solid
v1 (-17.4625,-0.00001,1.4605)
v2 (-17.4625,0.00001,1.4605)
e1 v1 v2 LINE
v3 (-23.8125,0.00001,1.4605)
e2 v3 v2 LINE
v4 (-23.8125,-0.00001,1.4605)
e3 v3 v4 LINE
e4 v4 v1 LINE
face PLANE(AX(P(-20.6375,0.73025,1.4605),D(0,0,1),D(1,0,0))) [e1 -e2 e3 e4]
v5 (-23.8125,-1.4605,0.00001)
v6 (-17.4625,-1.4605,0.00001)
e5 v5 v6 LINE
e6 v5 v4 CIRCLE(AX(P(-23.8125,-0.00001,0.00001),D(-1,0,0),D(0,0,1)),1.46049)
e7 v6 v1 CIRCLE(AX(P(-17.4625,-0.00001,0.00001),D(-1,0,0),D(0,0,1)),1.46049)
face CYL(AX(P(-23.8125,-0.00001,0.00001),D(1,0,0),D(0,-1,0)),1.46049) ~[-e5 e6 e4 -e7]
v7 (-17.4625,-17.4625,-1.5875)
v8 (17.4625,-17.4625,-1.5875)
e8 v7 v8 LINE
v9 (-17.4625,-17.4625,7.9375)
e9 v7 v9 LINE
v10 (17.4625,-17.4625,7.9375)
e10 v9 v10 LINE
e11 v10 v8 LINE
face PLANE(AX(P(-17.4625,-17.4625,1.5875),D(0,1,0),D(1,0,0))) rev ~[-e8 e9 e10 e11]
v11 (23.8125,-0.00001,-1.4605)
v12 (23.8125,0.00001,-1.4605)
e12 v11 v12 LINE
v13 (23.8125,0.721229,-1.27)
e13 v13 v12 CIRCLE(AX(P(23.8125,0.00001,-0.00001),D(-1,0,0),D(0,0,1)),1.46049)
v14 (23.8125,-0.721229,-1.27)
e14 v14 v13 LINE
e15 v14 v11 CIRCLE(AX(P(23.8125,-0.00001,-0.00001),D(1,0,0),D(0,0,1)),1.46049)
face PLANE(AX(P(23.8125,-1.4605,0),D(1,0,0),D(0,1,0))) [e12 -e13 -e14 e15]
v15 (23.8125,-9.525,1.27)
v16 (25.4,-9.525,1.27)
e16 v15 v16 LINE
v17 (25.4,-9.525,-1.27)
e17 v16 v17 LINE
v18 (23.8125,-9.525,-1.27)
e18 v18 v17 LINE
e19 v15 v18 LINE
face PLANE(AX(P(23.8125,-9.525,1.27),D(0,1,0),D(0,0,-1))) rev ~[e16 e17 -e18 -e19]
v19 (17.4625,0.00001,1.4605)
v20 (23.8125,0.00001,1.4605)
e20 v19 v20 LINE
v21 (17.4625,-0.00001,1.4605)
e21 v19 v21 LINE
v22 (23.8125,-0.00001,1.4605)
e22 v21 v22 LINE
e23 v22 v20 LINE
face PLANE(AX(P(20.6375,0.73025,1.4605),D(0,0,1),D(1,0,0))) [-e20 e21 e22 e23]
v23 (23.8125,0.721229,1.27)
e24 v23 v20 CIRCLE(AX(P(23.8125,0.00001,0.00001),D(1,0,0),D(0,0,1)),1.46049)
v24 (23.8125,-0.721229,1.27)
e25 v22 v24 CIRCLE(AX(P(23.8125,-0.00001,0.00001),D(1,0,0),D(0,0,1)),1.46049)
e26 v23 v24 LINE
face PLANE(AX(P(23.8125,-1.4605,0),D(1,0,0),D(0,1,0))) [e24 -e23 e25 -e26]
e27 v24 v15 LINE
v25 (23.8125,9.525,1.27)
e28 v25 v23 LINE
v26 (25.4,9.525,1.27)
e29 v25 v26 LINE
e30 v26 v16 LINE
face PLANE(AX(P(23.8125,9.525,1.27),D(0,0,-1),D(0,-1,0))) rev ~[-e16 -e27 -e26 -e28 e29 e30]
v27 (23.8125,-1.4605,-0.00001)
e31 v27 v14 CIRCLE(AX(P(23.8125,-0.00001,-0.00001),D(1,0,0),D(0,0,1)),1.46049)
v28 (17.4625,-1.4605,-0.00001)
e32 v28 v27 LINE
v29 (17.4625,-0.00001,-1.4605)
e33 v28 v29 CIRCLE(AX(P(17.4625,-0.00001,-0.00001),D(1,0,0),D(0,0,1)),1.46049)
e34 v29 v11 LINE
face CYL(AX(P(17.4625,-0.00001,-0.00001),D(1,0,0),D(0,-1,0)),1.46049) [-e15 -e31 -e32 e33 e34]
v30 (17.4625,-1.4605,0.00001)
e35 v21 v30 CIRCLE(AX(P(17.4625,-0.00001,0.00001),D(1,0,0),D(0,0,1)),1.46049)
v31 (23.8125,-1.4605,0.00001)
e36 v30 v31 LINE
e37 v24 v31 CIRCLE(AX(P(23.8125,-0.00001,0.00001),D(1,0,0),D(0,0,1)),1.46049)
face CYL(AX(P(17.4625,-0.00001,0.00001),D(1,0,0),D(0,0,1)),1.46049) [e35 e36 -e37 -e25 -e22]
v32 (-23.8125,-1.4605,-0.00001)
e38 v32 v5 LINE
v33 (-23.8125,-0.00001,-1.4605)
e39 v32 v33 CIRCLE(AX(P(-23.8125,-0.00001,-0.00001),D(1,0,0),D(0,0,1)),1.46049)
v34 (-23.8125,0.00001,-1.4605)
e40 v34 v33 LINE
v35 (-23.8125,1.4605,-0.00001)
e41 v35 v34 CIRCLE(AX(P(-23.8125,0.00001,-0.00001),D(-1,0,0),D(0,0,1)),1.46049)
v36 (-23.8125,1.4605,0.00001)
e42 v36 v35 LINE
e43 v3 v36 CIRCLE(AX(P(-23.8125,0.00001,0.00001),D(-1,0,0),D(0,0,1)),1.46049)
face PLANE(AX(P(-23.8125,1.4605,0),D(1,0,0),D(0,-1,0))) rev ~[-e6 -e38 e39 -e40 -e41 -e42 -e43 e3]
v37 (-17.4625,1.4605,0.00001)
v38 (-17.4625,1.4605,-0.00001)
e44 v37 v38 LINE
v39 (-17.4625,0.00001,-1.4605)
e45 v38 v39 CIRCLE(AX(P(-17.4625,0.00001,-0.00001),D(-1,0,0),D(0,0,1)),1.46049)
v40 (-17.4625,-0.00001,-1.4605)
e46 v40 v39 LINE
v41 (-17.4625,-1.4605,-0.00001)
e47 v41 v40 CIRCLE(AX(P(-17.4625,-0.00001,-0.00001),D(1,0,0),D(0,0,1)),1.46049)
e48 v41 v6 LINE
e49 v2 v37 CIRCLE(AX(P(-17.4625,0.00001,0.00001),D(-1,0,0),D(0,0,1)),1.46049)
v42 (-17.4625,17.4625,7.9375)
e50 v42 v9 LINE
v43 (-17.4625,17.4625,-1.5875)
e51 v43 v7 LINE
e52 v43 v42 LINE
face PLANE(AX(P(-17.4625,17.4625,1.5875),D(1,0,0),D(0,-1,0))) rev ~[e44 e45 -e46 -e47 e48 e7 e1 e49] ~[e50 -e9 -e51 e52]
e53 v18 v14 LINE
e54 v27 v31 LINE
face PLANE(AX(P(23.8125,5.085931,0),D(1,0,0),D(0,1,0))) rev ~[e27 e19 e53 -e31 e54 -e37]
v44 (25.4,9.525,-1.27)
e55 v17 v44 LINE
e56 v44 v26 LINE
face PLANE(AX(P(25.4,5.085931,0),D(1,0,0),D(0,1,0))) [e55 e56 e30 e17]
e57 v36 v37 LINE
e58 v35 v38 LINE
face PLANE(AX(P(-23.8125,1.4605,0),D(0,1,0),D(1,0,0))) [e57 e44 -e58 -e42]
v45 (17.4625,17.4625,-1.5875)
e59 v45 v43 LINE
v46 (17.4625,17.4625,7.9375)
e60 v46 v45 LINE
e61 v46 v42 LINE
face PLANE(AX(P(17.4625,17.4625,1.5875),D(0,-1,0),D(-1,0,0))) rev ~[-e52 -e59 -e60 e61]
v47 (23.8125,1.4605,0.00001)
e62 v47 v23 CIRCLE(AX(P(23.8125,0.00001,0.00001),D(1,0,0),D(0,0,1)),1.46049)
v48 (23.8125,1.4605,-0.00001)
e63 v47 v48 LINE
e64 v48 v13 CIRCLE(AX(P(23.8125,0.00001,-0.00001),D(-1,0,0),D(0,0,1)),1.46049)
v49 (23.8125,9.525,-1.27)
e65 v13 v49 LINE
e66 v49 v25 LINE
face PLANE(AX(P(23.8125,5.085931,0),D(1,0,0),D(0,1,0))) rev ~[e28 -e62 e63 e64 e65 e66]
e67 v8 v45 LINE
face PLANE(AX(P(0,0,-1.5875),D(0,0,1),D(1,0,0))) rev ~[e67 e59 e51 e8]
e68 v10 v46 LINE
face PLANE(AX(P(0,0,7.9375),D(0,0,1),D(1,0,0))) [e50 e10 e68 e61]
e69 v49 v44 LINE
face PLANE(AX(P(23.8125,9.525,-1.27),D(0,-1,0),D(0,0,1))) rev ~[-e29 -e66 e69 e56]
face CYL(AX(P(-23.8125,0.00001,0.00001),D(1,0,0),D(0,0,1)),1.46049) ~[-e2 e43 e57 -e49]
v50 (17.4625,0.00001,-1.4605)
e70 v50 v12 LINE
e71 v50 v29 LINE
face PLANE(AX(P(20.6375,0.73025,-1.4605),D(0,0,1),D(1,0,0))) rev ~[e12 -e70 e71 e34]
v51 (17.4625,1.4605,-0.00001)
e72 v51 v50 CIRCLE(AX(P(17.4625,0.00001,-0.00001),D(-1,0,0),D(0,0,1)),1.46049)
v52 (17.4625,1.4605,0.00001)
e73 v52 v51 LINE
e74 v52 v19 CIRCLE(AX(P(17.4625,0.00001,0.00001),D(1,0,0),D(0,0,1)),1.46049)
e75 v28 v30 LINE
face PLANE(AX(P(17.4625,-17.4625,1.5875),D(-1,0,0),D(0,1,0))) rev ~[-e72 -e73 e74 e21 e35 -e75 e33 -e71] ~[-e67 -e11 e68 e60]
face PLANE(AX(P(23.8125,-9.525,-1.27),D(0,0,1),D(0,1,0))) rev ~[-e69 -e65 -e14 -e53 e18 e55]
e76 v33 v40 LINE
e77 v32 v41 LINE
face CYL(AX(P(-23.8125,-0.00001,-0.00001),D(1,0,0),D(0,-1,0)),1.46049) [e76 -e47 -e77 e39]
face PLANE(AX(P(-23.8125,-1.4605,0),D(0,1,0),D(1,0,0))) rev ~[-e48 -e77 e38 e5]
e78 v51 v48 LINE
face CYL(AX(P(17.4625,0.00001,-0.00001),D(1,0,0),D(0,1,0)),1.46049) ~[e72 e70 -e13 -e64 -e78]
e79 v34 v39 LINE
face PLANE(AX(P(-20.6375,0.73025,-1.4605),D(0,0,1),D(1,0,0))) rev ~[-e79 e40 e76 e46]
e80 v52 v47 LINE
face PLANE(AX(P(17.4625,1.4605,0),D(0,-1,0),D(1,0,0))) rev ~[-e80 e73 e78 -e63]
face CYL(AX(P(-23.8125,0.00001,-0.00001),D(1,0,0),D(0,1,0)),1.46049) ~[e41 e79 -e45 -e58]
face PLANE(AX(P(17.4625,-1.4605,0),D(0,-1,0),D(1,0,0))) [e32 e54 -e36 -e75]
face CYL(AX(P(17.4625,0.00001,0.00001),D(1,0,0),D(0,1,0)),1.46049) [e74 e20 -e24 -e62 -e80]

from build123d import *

# Parameters (mm, degrees)
F0_W     = 31.75
F0_H     = 31.75
F1_DEPTH = 1.5875
F0_W_2   = 6.35
F0_H_2   = 1.4605
F2_DEPTH = 1.4605
F3_R     = 1.46049
F5_DEPTH = 1.5875
F6_DEPTH = 6.35


# Not quite as in the source:
# - a fillet or chamfer is up to 0.001 mm smaller than in the source, because OpenCascade refuses the exact size
# - ends of sketch curves that miss each other by under 0.0002 mm in the source are joined


with BuildPart() as f1:
    # F0 (on Top) → F1 (new body, symmetric)
    with BuildSketch(Plane.XY):
        Polygon((17.4625, 17.4625), (-17.4625, 17.4625), (-17.4625, 1.4605), (-17.4625, 0), (-17.4625, -1.4605), (-17.4625, -17.4625), (17.4625, -17.4625), (17.4625, -1.4605), (17.4625, 0), (17.4625, 1.4605), align=None)
        Rectangle(F0_W, F0_H, mode=Mode.SUBTRACT)
        Rectangle(F0_W, F0_H)
    extrude(amount=F1_DEPTH, both=True)

    # F0 (on Top) → F2 (join, symmetric)
    with BuildSketch(Plane.XY):
        with Locations((-20.6375, 0.73025)):
            Rectangle(F0_W_2, F0_H_2)
        with Locations((-20.6375, -0.73025)):
            Rectangle(F0_W_2, F0_H_2)
        with Locations((20.6375, 0.73025)):
            Rectangle(F0_W_2, F0_H_2)
        with Locations((20.6375, -0.73025)):
            Rectangle(F0_W_2, F0_H_2)
    extrude(amount=F2_DEPTH, both=True)

    # F3 (radius 1.4605 in the source; OpenCascade refuses exactly that, so slightly less here)
    f3_edges = [f1.edges().sort_by_distance(p)[0] for p in [
        (-20.6375, -1.4605, 1.4605),
        (-20.6375, 1.4605, 1.4605),
        (-20.6375, -1.4605, -1.4605),
        (-20.6375, 1.4605, -1.4605),
        (20.6375, 1.4605, -1.4605),
        (20.6375, -1.4605, -1.4605),
        (20.6375, -1.4605, 1.4605),
        (20.6375, 1.4605, 1.4605),
    ]]
    fillet(f3_edges, radius=F3_R)

    # F4 (on face) → F5 (join)
    with BuildSketch(Plane.YZ.offset(23.8125)):
        with BuildLine():
            Line((9.525, 1.27), (0.7212287186, 1.27))
            ThreePointArc((0.7212287186, 1.27), (1.2622230895, 0.7347542799), (1.4605, 1e-05))
            ThreePointArc((1.4605, 1e-05), (1.2622230895, -0.7347542799), (0.7212287186, -1.27))
            Line((0.7212287186, -1.27), (9.525, -1.27))
            Line((9.525, -1.27), (9.525, 1.27))
        make_face()
        with BuildLine():
            Line((-0.7212287186, 1.27), (-9.525, 1.27))
            Line((-9.525, 1.27), (-9.525, -1.27))
            Line((-9.525, -1.27), (-0.7212287186, -1.27))
            ThreePointArc((-0.7212287186, -1.27), (-1.2622230895, -0.7347542799), (-1.4605, -1e-05))
            ThreePointArc((-1.4605, -1e-05), (-1.2622230895, 0.7347542799), (-0.7212287186, 1.27))
        make_face()
        with BuildLine():
            Line((0.7212287186, 1.27), (-0.7212287186, 1.27))
            ThreePointArc((-0.7212287186, 1.27), (-1.2622230895, 0.7347542799), (-1.4605, 1e-05))
            ThreePointArc((-1.4605, 1e-05), (-1.2622230895, -0.7347542799), (-0.7212287186, -1.27))
            Line((-0.7212287186, -1.27), (0.7212287186, -1.27))
            ThreePointArc((0.7212287186, -1.27), (1.2622230895, -0.7347542799), (1.4605, -1e-05))
            ThreePointArc((1.4605, -1e-05), (1.2622230895, 0.7347542799), (0.7212287186, 1.27))
        make_face()
    extrude(amount=F5_DEPTH)

    # F6 (add): a face of the model
    f6_faces = [f1.faces().sort_by_distance(p)[0] for p in [
        (0, 0, 1.5875),
    ]]
    extrude(f6_faces, amount=F6_DEPTH)


solid = f1.part
